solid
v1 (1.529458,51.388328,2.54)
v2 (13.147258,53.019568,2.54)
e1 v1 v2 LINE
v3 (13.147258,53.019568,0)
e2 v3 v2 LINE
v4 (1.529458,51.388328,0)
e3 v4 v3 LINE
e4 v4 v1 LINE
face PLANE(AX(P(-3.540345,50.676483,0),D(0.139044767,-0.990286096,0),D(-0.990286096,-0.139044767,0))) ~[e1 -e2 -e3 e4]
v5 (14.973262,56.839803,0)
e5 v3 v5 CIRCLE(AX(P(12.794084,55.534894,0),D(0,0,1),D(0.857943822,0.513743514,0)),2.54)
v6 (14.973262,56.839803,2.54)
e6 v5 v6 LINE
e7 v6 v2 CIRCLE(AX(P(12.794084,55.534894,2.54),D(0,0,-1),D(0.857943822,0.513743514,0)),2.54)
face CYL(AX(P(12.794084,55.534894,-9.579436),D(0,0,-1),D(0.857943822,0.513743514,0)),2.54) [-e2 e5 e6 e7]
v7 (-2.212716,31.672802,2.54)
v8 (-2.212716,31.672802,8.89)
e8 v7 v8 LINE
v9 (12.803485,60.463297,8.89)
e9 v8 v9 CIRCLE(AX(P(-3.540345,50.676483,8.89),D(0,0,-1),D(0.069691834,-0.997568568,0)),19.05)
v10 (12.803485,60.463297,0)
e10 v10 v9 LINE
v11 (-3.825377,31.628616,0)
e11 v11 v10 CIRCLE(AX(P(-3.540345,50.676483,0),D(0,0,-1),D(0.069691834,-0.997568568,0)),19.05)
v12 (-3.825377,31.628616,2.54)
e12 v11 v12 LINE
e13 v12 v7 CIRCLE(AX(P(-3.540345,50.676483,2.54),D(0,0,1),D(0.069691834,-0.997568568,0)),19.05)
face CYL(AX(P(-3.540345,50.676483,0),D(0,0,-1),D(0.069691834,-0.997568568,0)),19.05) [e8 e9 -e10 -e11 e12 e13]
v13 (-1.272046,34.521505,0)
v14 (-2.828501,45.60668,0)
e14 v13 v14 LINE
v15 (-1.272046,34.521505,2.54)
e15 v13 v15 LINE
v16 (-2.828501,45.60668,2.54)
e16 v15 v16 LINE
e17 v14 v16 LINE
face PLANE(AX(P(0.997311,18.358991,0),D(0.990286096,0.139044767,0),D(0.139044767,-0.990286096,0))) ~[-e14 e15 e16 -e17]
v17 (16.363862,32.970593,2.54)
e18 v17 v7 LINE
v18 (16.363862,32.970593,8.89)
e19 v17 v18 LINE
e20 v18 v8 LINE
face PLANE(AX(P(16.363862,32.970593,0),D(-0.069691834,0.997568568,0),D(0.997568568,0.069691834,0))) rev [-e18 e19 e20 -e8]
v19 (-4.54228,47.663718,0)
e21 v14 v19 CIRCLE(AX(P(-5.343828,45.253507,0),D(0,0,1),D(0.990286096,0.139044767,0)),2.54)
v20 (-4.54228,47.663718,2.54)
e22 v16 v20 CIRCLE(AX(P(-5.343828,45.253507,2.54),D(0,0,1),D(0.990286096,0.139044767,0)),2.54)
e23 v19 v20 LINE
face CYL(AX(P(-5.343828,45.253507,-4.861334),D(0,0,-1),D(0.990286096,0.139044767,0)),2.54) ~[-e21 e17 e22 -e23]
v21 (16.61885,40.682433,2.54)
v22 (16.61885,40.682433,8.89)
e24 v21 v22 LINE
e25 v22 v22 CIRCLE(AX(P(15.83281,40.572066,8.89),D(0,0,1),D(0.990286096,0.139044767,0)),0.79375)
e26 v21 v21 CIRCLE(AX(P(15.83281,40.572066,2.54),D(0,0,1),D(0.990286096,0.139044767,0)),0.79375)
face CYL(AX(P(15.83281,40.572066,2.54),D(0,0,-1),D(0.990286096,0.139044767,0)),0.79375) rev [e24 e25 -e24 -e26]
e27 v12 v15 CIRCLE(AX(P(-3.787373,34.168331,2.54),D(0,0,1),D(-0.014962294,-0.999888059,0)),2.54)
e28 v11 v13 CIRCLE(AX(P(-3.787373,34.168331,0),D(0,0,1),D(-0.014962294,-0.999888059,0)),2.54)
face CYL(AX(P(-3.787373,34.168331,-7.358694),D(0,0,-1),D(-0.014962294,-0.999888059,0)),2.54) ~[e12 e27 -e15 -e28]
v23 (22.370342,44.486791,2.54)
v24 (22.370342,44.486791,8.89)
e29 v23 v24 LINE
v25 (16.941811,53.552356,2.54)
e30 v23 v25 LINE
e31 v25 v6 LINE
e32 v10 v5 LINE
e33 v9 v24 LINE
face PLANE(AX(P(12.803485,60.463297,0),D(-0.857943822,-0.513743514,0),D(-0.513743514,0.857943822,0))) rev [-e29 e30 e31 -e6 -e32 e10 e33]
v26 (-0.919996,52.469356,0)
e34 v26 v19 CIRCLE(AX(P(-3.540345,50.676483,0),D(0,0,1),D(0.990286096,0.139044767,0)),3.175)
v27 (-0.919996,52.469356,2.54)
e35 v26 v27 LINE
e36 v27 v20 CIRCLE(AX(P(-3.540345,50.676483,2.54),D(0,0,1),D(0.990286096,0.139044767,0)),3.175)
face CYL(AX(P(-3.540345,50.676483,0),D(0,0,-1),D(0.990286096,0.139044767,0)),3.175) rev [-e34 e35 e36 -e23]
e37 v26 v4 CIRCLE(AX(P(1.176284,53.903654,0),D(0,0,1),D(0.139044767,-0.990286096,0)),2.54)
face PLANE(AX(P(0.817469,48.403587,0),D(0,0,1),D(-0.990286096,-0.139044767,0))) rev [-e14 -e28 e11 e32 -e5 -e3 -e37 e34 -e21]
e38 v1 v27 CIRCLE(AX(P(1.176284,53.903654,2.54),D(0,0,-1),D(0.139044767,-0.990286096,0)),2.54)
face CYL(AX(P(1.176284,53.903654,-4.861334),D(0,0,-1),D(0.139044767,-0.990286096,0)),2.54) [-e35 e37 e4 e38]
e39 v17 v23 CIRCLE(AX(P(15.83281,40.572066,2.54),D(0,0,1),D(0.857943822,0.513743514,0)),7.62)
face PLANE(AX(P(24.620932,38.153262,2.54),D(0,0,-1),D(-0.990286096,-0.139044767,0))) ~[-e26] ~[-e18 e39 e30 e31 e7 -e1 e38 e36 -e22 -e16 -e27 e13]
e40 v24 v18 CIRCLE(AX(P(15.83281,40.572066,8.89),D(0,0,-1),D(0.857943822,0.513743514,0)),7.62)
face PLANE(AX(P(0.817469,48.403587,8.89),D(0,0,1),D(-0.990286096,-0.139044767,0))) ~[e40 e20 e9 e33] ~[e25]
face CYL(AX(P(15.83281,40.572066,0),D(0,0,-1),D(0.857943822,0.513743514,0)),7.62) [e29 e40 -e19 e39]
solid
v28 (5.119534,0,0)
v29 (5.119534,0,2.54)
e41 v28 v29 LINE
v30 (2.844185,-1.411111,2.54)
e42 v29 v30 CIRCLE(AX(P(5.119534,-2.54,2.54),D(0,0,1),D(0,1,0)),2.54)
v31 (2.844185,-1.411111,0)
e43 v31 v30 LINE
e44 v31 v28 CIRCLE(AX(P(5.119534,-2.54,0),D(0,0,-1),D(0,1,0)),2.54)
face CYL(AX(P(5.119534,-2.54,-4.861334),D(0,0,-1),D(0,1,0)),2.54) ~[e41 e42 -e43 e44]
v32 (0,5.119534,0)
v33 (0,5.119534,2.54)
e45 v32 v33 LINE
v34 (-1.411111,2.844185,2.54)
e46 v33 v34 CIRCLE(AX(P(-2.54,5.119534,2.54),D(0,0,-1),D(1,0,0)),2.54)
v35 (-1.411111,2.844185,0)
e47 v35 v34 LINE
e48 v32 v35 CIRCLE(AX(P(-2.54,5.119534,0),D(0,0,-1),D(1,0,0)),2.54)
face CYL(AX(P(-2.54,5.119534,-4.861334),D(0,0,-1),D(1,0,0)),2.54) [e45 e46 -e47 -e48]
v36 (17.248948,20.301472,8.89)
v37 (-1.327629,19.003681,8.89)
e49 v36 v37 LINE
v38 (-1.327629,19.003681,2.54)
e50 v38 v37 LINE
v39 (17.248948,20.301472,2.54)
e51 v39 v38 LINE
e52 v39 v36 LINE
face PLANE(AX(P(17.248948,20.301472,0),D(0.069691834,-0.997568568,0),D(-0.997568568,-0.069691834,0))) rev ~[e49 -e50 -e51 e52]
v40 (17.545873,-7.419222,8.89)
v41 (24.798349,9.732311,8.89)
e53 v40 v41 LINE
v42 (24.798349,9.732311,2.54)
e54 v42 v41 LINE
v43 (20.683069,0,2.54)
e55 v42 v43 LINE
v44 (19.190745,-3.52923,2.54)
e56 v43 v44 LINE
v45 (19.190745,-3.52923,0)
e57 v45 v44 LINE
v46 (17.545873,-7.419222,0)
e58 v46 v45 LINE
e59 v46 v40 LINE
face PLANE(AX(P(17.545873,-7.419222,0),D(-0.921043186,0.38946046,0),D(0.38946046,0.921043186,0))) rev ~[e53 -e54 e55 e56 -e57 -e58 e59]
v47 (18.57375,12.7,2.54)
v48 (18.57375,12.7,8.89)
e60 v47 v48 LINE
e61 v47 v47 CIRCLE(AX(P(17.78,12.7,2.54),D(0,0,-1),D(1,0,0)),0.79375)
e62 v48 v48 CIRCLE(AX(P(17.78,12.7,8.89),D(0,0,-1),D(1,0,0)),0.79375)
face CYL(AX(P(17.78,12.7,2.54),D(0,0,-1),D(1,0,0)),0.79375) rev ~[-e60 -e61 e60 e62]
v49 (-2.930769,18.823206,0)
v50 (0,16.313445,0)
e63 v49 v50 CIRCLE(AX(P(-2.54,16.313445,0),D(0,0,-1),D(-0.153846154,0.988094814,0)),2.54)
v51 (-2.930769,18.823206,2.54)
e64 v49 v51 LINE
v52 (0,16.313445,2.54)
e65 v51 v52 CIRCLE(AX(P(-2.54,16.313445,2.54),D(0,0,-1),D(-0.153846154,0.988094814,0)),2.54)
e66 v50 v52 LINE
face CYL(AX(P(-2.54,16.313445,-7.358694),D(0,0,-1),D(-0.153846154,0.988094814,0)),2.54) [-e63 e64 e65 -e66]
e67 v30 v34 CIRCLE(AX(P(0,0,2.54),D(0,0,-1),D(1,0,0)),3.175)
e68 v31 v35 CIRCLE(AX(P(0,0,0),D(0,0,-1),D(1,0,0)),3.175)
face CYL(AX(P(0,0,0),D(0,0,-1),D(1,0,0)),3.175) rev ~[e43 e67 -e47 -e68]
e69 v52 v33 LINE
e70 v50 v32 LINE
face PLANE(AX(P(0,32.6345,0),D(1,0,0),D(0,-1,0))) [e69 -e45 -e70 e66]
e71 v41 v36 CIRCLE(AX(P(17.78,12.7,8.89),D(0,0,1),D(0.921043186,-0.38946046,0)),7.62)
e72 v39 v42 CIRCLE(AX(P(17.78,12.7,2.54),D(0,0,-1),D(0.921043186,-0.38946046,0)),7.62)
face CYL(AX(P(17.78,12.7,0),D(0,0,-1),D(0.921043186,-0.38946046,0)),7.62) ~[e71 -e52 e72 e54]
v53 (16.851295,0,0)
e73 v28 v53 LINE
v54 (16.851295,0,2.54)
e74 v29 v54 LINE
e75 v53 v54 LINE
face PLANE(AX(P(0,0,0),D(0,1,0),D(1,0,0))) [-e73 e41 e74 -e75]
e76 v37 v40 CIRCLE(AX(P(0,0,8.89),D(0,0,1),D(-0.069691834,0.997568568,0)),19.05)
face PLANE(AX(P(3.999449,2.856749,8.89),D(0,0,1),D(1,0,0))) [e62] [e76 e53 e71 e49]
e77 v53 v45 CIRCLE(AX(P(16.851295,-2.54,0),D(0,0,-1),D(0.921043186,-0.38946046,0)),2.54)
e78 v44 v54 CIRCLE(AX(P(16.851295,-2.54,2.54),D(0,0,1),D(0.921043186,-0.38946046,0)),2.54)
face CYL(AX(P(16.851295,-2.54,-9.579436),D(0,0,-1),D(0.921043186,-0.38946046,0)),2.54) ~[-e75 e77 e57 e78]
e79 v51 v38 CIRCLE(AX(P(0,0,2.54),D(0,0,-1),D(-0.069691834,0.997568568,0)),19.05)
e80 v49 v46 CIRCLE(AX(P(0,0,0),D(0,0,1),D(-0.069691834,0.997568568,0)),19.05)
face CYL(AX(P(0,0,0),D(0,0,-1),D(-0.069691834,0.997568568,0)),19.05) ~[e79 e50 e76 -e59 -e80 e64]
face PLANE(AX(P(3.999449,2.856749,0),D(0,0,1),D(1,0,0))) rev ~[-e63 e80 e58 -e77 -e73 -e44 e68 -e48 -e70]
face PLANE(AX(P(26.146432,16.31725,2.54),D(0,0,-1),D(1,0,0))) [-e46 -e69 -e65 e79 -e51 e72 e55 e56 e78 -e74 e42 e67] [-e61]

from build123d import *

# Parameters (mm, degrees)
F1_DEPTH    = 8.89
F2_W        = 52.2928647697
F2_H        = 32.6345004141
F3_DEPTH    = 2.54
F4_R        = 3.175
F5_DEPTH    = 2.54
F6_R        = 0.79375
F7_DEPTH    = 6.351
F8_T1_DEPTH = 7.4013341754
F8_T3_DEPTH = 12.1194356419
F8_T5_DEPTH = 9.8986940254


# Not quite as in the source:
# - a fillet or chamfer that OpenCascade refuses, or shapes differently, is made with other operations: its cross-section is extruded or revolved along the edge and cut away or added


with BuildPart() as f1:
    # F0 (on Top) → F1 (new body)
    with BuildSketch(Plane.XY):
        with BuildLine():
            Line((17.2489482218, 20.3014724895), (-1.3276294456, 19.0036812238))
            ThreePointArc((-1.3276294456, 19.0036812238), (-15.5016226265, -11.0725875903), (17.5458726888, -7.4192217643))
            Line((17.5458726888, -7.4192217643), (24.7983490755, 9.7323112943))
            ThreePointArc((24.7983490755, 9.7323112943), (23.9806490506, 17.1290350361), (17.2489482218, 20.3014724895))
        make_face()
    extrude(amount=F1_DEPTH)

    # F2 (on face) → F3 (cut)
    with BuildSketch(Plane(origin=(0, 0, 0), x_dir=(1, 0, 0), z_dir=(0, 0, -1))):
        with Locations((26.1464323848, -16.3172502071)):
            Rectangle(F2_W, F2_H)
    extrude(amount=-F3_DEPTH, mode=Mode.SUBTRACT)

    # F4 (on face) → F5 (cut, through all)
    with BuildSketch(Plane(origin=(0, 0, 0), x_dir=(1, 0, 0), z_dir=(0, 0, -1))):
        Circle(F4_R)
    extrude(amount=-F5_DEPTH, mode=Mode.SUBTRACT)

    # F6 (on face) → F7 (cut, through all)
    with BuildSketch(Plane(origin=(0, 0, 2.54), x_dir=(1, 0, 0), z_dir=(0, 0, -1))):
        with Locations((17.78, -12.7)):
            Circle(F6_R)
    extrude(amount=-F7_DEPTH, mode=Mode.SUBTRACT)

    # F8: fillet of radius 2.54 on 4 edges, made by hand

    # F8_s2 → F8_t1 (cut)
    with BuildSketch(Plane.XY.offset(-4.8613341754)):
        with BuildLine():
            ThreePointArc((5.1195336702, 0), (3.7808361274, -0.3814150726), (2.8441853723, -1.4111111111))
            ThreePointArc((2.8441853723, -1.4111111111), (3.091190188, -0.7246849118), (3.175, 0))
            Line((3.175, 0), (5.1195336702, 0))
        make_face()
        with BuildLine():
            ThreePointArc((0, 5.1195336702), (-0.3814150726, 3.7808361274), (-1.4111111111, 2.8441853723))
            ThreePointArc((-1.4111111111, 2.8441853723), (-0.7246849118, 3.091190188), (0, 3.175))
            Line((0, 3.175), (0, 5.1195336702))
        make_face()
    extrude(amount=F8_T1_DEPTH, mode=Mode.SUBTRACT)

    # F8_s4 → F8_t3 (cut)
    with BuildSketch(Plane.XY.offset(-9.5794356419)):
        with BuildLine():
            ThreePointArc((19.1907446922, -3.5292295686), (18.9683971595, -1.1366189228), (16.8512950004, 0))
            Line((16.8512950004, 0), (20.6830692572, 0))
            Line((20.6830692572, 0), (19.1907446922, -3.5292295686))
        make_face()
    extrude(amount=F8_T3_DEPTH, mode=Mode.SUBTRACT)

    # F8_s6 → F8_t5 (cut)
    with BuildSketch(Plane.XY.offset(-7.3586940254)):
        with BuildLine():
            ThreePointArc((-2.9307692308, 18.8232062018), (-0.8878731656, 18.2427138692), (0, 16.3134453749))
            Line((0, 16.3134453749), (0.254, 16.3134453749))
            Line((0.254, 16.3134453749), (0.254, 19.0964316717))
            Line((0.254, 19.0964316717), (-0.0177017259, 19.349814088))
            ThreePointArc((-0.0177017259, 19.349814088), (-1.3453311715, 19.2570636401), (-2.9698461538, 19.0741822845))
            Line((-2.9698461538, 19.0741822845), (-2.9307692308, 18.8232062018))
        make_face()
    extrude(amount=F8_T5_DEPTH, mode=Mode.SUBTRACT)


with BuildPart() as f10_1:
    # F10: instance of F1
    add(f1.part.mirror(Plane(origin=(7.5181162396, 25.9871372646, 5.715), x_dir=(-0.9975685682, -0.0696918344, 0), z_dir=(-0.0696918344, 0.9975685682, 0))))


solid = Compound([f1.part, f10_1.part])
